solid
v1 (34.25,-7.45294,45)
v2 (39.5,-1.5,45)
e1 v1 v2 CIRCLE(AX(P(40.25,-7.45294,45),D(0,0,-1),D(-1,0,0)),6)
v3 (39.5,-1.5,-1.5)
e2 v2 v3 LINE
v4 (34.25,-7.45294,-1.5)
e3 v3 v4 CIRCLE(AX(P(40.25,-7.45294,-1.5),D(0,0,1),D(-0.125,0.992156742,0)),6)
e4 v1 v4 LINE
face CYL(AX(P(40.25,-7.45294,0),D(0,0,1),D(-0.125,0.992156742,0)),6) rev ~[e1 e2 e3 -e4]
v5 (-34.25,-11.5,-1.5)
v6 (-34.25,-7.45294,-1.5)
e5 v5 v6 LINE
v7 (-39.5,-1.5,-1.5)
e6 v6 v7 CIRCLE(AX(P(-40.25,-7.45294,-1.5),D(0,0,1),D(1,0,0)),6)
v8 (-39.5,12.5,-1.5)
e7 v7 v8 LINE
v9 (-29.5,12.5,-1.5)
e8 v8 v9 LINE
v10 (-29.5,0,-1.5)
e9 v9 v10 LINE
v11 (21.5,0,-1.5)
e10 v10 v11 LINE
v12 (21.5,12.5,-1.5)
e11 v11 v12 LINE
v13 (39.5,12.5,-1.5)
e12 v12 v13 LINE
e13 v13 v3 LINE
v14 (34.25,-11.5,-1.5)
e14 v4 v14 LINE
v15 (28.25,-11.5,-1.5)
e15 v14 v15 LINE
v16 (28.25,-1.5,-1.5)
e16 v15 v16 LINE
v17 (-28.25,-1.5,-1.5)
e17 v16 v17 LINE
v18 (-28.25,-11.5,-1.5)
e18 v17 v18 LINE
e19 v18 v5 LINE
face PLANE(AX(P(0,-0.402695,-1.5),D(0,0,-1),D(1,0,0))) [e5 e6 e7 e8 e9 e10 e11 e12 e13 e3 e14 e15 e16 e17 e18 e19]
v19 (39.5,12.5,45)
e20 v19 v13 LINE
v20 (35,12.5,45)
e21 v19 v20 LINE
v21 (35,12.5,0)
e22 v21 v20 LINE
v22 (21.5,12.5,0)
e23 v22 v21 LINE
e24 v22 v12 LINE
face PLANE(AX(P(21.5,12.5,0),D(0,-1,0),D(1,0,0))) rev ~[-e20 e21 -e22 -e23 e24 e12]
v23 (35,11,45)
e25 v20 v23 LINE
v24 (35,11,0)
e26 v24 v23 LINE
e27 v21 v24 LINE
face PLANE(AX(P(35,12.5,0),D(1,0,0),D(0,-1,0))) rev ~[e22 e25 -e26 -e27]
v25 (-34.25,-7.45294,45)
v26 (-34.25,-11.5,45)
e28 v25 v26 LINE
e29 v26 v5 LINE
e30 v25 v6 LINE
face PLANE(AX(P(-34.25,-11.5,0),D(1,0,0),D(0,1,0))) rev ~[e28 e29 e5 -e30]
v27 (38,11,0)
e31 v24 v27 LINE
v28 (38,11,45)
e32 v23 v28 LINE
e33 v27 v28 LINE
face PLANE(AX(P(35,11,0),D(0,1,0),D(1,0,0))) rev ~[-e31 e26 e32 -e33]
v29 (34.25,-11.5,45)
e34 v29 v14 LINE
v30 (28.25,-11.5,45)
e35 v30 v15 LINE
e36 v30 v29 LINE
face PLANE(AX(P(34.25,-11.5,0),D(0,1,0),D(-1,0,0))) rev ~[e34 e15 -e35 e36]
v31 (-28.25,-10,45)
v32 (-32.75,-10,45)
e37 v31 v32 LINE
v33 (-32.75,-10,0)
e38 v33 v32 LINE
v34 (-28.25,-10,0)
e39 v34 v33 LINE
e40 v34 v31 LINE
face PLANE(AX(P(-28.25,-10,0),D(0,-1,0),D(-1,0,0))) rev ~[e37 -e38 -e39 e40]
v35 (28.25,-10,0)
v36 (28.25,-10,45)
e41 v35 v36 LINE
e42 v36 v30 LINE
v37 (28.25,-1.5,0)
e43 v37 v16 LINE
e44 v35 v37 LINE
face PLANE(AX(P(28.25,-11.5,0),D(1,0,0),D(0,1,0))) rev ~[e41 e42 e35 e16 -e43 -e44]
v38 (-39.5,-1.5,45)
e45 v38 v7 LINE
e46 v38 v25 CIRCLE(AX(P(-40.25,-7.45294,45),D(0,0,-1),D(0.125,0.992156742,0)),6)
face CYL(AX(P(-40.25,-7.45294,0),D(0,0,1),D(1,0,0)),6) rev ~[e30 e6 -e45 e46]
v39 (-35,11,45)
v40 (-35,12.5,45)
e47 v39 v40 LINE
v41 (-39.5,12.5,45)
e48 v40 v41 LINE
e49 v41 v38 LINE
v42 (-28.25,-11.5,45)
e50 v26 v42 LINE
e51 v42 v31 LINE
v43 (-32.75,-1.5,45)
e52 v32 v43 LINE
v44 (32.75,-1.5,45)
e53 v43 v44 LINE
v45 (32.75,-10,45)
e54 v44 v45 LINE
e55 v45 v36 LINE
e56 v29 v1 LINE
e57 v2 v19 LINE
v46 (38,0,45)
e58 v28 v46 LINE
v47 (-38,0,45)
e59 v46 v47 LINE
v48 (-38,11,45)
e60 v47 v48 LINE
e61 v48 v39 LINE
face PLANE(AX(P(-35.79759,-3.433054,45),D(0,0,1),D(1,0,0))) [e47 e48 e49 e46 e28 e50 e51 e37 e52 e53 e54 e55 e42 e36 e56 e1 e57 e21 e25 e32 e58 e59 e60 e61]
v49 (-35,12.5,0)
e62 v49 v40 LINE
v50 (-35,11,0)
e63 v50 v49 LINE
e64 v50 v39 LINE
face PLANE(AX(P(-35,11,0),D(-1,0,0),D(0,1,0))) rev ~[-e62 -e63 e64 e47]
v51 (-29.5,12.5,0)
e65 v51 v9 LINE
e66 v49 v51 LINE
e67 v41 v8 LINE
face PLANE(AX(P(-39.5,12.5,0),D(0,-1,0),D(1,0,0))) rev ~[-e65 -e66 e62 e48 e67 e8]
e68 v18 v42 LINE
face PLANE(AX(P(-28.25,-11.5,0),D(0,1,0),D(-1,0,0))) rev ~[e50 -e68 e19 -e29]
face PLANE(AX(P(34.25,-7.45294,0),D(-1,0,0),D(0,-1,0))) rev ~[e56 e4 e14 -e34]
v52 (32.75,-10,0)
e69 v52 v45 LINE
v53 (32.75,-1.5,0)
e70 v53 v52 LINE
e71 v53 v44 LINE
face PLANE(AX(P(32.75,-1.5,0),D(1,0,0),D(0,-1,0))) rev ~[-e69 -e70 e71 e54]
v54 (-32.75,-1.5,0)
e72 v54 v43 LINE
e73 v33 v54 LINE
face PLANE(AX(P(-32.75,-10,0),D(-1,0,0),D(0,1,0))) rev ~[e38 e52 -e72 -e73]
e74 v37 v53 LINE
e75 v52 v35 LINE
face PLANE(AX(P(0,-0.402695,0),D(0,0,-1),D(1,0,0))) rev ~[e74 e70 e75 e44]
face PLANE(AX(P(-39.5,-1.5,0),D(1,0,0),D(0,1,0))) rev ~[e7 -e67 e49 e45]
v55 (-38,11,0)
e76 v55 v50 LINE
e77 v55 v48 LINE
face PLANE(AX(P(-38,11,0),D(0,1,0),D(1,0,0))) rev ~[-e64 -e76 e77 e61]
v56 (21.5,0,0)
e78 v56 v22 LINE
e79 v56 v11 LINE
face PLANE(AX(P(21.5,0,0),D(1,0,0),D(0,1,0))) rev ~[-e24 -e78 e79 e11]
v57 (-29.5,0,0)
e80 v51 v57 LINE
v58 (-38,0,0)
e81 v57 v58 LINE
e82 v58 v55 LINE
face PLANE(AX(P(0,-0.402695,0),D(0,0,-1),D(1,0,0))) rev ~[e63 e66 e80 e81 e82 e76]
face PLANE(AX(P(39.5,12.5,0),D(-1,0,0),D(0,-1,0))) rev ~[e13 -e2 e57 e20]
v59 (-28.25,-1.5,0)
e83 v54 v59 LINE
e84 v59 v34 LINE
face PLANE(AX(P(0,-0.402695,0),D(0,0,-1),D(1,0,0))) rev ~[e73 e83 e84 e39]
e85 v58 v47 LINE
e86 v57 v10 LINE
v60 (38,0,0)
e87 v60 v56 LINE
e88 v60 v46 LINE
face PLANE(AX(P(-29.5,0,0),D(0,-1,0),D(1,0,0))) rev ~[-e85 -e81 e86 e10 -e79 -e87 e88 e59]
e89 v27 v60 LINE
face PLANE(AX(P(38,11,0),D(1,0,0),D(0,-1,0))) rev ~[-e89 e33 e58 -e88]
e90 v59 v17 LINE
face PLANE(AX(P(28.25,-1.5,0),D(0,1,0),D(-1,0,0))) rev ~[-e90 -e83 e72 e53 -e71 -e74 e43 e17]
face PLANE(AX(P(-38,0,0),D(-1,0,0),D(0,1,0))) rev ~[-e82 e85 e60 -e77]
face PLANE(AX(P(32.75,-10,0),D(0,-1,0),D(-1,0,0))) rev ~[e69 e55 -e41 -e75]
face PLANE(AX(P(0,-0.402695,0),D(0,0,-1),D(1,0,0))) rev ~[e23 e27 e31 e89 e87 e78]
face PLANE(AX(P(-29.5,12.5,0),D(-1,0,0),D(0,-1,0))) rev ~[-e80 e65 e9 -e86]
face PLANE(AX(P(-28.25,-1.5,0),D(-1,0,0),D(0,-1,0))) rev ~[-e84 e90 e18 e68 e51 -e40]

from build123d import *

# Parameters (mm, degrees)
F1_DEPTH    = 45
F2_T1_DEPTH = 45
F3_W        = 4.5
F3_H        = 8.5
F4_DEPTH    = 1.5


# Not quite as in the source:
# - a fillet or chamfer that OpenCascade refuses, or shapes differently, is made with other operations: its cross-section is extruded or revolved along the edge and cut away or added


with BuildPart() as f1:
    # F0 (on Top) → F1 (new body)
    with BuildSketch(Plane.XY):
        Polygon((38, 0), (0, 0), (-38, 0), (-38, 11), (-35, 11), (-35, 12.5), (-39.5, 12.5), (-39.5, -1.5), (-34.25, -1.5), (-32.75, -1.5), (0, -1.5), (32.75, -1.5), (34.25, -1.5), (39.5, -1.5), (39.5, 12.5), (35, 12.5), (35, 11), (38, 11), align=None)
        Polygon((-32.75, -1.5), (-34.25, -1.5), (-34.25, -11.5), (-28.25, -11.5), (-28.25, -10), (-32.75, -10), align=None)
        Polygon((34.25, -11.5), (34.25, -1.5), (32.75, -1.5), (32.75, -10), (28.25, -10), (28.25, -11.5), align=None)
    extrude(amount=F1_DEPTH)

    # F2: fillet of radius 6 on 2 edges, made by hand

    # F2_s2 → F2_t1 (join)
    with BuildSketch(Plane.XY):
        with BuildLine():
            ThreePointArc((-39.5, -1.5), (-35.75, -3.4843134833), (-34.25, -7.4529404499))
            Line((-34.25, -7.4529404499), (-34.25, -1.5))
            Line((-34.25, -1.5), (-39.5, -1.5))
        make_face()
        with BuildLine():
            ThreePointArc((34.25, -7.4529404499), (35.75, -3.4843134833), (39.5, -1.5))
            Line((39.5, -1.5), (34.25, -1.5))
            Line((34.25, -1.5), (34.25, -7.4529404499))
        make_face()
    extrude(amount=F2_T1_DEPTH)

    # F3 (on face) → F4 (join)
    with BuildSketch(Plane(origin=(0, 0, 0), x_dir=(1, 0, 0), z_dir=(0, 0, -1))):
        with BuildLine():
            Line((-32.75, 10), (-28.25, 10))
            Line((-28.25, 10), (-28.25, 11.5))
            Line((-28.25, 11.5), (-34.25, 11.5))
            Line((-34.25, 11.5), (-34.25, 7.4529404499))
            ThreePointArc((-34.25, 7.4529404499), (-35.75, 3.4843134833), (-39.5, 1.5))
            Line((-39.5, 1.5), (-39.5, -12.5))
            Line((-39.5, -12.5), (-35, -12.5))
            Line((-35, -12.5), (-35, -11))
            Line((-35, -11), (-38, -11))
            Line((-38, -11), (-38, 0))
            Line((-38, 0), (-29.5, 0))
            Line((-29.5, 0), (21.5, 0))
            Line((21.5, 0), (38, 0))
            Line((38, 0), (38, -11))
            Line((38, -11), (35, -11))
            Line((35, -11), (35, -12.5))
            Line((35, -12.5), (39.5, -12.5))
            Line((39.5, -12.5), (39.5, 1.5))
            ThreePointArc((39.5, 1.5), (35.75, 3.4843134833), (34.25, 7.4529404499))
            Line((34.25, 7.4529404499), (34.25, 11.5))
            Line((34.25, 11.5), (28.25, 11.5))
            Line((28.25, 11.5), (28.25, 10))
            Line((28.25, 10), (32.75, 10))
            Line((32.75, 10), (32.75, 1.5))
            Line((32.75, 1.5), (28.25, 1.5))
            Line((28.25, 1.5), (-28.25, 1.5))
            Line((-28.25, 1.5), (-32.75, 1.5))
            Line((-32.75, 1.5), (-32.75, 10))
        make_face()
        with Locations((-30.5, 5.75)):
            Rectangle(F3_W, F3_H)
        Polygon((-35, -11), (-35, -12.5), (-29.5, -12.5), (-29.5, 0), (-38, 0), (-38, -11), align=None)
        with Locations((30.5, 5.75)):
            Rectangle(F3_W, F3_H)
        Polygon((21.5, -12.5), (35, -12.5), (35, -11), (38, -11), (38, 0), (21.5, 0), align=None)
    extrude(amount=F4_DEPTH)


solid = f1.part
